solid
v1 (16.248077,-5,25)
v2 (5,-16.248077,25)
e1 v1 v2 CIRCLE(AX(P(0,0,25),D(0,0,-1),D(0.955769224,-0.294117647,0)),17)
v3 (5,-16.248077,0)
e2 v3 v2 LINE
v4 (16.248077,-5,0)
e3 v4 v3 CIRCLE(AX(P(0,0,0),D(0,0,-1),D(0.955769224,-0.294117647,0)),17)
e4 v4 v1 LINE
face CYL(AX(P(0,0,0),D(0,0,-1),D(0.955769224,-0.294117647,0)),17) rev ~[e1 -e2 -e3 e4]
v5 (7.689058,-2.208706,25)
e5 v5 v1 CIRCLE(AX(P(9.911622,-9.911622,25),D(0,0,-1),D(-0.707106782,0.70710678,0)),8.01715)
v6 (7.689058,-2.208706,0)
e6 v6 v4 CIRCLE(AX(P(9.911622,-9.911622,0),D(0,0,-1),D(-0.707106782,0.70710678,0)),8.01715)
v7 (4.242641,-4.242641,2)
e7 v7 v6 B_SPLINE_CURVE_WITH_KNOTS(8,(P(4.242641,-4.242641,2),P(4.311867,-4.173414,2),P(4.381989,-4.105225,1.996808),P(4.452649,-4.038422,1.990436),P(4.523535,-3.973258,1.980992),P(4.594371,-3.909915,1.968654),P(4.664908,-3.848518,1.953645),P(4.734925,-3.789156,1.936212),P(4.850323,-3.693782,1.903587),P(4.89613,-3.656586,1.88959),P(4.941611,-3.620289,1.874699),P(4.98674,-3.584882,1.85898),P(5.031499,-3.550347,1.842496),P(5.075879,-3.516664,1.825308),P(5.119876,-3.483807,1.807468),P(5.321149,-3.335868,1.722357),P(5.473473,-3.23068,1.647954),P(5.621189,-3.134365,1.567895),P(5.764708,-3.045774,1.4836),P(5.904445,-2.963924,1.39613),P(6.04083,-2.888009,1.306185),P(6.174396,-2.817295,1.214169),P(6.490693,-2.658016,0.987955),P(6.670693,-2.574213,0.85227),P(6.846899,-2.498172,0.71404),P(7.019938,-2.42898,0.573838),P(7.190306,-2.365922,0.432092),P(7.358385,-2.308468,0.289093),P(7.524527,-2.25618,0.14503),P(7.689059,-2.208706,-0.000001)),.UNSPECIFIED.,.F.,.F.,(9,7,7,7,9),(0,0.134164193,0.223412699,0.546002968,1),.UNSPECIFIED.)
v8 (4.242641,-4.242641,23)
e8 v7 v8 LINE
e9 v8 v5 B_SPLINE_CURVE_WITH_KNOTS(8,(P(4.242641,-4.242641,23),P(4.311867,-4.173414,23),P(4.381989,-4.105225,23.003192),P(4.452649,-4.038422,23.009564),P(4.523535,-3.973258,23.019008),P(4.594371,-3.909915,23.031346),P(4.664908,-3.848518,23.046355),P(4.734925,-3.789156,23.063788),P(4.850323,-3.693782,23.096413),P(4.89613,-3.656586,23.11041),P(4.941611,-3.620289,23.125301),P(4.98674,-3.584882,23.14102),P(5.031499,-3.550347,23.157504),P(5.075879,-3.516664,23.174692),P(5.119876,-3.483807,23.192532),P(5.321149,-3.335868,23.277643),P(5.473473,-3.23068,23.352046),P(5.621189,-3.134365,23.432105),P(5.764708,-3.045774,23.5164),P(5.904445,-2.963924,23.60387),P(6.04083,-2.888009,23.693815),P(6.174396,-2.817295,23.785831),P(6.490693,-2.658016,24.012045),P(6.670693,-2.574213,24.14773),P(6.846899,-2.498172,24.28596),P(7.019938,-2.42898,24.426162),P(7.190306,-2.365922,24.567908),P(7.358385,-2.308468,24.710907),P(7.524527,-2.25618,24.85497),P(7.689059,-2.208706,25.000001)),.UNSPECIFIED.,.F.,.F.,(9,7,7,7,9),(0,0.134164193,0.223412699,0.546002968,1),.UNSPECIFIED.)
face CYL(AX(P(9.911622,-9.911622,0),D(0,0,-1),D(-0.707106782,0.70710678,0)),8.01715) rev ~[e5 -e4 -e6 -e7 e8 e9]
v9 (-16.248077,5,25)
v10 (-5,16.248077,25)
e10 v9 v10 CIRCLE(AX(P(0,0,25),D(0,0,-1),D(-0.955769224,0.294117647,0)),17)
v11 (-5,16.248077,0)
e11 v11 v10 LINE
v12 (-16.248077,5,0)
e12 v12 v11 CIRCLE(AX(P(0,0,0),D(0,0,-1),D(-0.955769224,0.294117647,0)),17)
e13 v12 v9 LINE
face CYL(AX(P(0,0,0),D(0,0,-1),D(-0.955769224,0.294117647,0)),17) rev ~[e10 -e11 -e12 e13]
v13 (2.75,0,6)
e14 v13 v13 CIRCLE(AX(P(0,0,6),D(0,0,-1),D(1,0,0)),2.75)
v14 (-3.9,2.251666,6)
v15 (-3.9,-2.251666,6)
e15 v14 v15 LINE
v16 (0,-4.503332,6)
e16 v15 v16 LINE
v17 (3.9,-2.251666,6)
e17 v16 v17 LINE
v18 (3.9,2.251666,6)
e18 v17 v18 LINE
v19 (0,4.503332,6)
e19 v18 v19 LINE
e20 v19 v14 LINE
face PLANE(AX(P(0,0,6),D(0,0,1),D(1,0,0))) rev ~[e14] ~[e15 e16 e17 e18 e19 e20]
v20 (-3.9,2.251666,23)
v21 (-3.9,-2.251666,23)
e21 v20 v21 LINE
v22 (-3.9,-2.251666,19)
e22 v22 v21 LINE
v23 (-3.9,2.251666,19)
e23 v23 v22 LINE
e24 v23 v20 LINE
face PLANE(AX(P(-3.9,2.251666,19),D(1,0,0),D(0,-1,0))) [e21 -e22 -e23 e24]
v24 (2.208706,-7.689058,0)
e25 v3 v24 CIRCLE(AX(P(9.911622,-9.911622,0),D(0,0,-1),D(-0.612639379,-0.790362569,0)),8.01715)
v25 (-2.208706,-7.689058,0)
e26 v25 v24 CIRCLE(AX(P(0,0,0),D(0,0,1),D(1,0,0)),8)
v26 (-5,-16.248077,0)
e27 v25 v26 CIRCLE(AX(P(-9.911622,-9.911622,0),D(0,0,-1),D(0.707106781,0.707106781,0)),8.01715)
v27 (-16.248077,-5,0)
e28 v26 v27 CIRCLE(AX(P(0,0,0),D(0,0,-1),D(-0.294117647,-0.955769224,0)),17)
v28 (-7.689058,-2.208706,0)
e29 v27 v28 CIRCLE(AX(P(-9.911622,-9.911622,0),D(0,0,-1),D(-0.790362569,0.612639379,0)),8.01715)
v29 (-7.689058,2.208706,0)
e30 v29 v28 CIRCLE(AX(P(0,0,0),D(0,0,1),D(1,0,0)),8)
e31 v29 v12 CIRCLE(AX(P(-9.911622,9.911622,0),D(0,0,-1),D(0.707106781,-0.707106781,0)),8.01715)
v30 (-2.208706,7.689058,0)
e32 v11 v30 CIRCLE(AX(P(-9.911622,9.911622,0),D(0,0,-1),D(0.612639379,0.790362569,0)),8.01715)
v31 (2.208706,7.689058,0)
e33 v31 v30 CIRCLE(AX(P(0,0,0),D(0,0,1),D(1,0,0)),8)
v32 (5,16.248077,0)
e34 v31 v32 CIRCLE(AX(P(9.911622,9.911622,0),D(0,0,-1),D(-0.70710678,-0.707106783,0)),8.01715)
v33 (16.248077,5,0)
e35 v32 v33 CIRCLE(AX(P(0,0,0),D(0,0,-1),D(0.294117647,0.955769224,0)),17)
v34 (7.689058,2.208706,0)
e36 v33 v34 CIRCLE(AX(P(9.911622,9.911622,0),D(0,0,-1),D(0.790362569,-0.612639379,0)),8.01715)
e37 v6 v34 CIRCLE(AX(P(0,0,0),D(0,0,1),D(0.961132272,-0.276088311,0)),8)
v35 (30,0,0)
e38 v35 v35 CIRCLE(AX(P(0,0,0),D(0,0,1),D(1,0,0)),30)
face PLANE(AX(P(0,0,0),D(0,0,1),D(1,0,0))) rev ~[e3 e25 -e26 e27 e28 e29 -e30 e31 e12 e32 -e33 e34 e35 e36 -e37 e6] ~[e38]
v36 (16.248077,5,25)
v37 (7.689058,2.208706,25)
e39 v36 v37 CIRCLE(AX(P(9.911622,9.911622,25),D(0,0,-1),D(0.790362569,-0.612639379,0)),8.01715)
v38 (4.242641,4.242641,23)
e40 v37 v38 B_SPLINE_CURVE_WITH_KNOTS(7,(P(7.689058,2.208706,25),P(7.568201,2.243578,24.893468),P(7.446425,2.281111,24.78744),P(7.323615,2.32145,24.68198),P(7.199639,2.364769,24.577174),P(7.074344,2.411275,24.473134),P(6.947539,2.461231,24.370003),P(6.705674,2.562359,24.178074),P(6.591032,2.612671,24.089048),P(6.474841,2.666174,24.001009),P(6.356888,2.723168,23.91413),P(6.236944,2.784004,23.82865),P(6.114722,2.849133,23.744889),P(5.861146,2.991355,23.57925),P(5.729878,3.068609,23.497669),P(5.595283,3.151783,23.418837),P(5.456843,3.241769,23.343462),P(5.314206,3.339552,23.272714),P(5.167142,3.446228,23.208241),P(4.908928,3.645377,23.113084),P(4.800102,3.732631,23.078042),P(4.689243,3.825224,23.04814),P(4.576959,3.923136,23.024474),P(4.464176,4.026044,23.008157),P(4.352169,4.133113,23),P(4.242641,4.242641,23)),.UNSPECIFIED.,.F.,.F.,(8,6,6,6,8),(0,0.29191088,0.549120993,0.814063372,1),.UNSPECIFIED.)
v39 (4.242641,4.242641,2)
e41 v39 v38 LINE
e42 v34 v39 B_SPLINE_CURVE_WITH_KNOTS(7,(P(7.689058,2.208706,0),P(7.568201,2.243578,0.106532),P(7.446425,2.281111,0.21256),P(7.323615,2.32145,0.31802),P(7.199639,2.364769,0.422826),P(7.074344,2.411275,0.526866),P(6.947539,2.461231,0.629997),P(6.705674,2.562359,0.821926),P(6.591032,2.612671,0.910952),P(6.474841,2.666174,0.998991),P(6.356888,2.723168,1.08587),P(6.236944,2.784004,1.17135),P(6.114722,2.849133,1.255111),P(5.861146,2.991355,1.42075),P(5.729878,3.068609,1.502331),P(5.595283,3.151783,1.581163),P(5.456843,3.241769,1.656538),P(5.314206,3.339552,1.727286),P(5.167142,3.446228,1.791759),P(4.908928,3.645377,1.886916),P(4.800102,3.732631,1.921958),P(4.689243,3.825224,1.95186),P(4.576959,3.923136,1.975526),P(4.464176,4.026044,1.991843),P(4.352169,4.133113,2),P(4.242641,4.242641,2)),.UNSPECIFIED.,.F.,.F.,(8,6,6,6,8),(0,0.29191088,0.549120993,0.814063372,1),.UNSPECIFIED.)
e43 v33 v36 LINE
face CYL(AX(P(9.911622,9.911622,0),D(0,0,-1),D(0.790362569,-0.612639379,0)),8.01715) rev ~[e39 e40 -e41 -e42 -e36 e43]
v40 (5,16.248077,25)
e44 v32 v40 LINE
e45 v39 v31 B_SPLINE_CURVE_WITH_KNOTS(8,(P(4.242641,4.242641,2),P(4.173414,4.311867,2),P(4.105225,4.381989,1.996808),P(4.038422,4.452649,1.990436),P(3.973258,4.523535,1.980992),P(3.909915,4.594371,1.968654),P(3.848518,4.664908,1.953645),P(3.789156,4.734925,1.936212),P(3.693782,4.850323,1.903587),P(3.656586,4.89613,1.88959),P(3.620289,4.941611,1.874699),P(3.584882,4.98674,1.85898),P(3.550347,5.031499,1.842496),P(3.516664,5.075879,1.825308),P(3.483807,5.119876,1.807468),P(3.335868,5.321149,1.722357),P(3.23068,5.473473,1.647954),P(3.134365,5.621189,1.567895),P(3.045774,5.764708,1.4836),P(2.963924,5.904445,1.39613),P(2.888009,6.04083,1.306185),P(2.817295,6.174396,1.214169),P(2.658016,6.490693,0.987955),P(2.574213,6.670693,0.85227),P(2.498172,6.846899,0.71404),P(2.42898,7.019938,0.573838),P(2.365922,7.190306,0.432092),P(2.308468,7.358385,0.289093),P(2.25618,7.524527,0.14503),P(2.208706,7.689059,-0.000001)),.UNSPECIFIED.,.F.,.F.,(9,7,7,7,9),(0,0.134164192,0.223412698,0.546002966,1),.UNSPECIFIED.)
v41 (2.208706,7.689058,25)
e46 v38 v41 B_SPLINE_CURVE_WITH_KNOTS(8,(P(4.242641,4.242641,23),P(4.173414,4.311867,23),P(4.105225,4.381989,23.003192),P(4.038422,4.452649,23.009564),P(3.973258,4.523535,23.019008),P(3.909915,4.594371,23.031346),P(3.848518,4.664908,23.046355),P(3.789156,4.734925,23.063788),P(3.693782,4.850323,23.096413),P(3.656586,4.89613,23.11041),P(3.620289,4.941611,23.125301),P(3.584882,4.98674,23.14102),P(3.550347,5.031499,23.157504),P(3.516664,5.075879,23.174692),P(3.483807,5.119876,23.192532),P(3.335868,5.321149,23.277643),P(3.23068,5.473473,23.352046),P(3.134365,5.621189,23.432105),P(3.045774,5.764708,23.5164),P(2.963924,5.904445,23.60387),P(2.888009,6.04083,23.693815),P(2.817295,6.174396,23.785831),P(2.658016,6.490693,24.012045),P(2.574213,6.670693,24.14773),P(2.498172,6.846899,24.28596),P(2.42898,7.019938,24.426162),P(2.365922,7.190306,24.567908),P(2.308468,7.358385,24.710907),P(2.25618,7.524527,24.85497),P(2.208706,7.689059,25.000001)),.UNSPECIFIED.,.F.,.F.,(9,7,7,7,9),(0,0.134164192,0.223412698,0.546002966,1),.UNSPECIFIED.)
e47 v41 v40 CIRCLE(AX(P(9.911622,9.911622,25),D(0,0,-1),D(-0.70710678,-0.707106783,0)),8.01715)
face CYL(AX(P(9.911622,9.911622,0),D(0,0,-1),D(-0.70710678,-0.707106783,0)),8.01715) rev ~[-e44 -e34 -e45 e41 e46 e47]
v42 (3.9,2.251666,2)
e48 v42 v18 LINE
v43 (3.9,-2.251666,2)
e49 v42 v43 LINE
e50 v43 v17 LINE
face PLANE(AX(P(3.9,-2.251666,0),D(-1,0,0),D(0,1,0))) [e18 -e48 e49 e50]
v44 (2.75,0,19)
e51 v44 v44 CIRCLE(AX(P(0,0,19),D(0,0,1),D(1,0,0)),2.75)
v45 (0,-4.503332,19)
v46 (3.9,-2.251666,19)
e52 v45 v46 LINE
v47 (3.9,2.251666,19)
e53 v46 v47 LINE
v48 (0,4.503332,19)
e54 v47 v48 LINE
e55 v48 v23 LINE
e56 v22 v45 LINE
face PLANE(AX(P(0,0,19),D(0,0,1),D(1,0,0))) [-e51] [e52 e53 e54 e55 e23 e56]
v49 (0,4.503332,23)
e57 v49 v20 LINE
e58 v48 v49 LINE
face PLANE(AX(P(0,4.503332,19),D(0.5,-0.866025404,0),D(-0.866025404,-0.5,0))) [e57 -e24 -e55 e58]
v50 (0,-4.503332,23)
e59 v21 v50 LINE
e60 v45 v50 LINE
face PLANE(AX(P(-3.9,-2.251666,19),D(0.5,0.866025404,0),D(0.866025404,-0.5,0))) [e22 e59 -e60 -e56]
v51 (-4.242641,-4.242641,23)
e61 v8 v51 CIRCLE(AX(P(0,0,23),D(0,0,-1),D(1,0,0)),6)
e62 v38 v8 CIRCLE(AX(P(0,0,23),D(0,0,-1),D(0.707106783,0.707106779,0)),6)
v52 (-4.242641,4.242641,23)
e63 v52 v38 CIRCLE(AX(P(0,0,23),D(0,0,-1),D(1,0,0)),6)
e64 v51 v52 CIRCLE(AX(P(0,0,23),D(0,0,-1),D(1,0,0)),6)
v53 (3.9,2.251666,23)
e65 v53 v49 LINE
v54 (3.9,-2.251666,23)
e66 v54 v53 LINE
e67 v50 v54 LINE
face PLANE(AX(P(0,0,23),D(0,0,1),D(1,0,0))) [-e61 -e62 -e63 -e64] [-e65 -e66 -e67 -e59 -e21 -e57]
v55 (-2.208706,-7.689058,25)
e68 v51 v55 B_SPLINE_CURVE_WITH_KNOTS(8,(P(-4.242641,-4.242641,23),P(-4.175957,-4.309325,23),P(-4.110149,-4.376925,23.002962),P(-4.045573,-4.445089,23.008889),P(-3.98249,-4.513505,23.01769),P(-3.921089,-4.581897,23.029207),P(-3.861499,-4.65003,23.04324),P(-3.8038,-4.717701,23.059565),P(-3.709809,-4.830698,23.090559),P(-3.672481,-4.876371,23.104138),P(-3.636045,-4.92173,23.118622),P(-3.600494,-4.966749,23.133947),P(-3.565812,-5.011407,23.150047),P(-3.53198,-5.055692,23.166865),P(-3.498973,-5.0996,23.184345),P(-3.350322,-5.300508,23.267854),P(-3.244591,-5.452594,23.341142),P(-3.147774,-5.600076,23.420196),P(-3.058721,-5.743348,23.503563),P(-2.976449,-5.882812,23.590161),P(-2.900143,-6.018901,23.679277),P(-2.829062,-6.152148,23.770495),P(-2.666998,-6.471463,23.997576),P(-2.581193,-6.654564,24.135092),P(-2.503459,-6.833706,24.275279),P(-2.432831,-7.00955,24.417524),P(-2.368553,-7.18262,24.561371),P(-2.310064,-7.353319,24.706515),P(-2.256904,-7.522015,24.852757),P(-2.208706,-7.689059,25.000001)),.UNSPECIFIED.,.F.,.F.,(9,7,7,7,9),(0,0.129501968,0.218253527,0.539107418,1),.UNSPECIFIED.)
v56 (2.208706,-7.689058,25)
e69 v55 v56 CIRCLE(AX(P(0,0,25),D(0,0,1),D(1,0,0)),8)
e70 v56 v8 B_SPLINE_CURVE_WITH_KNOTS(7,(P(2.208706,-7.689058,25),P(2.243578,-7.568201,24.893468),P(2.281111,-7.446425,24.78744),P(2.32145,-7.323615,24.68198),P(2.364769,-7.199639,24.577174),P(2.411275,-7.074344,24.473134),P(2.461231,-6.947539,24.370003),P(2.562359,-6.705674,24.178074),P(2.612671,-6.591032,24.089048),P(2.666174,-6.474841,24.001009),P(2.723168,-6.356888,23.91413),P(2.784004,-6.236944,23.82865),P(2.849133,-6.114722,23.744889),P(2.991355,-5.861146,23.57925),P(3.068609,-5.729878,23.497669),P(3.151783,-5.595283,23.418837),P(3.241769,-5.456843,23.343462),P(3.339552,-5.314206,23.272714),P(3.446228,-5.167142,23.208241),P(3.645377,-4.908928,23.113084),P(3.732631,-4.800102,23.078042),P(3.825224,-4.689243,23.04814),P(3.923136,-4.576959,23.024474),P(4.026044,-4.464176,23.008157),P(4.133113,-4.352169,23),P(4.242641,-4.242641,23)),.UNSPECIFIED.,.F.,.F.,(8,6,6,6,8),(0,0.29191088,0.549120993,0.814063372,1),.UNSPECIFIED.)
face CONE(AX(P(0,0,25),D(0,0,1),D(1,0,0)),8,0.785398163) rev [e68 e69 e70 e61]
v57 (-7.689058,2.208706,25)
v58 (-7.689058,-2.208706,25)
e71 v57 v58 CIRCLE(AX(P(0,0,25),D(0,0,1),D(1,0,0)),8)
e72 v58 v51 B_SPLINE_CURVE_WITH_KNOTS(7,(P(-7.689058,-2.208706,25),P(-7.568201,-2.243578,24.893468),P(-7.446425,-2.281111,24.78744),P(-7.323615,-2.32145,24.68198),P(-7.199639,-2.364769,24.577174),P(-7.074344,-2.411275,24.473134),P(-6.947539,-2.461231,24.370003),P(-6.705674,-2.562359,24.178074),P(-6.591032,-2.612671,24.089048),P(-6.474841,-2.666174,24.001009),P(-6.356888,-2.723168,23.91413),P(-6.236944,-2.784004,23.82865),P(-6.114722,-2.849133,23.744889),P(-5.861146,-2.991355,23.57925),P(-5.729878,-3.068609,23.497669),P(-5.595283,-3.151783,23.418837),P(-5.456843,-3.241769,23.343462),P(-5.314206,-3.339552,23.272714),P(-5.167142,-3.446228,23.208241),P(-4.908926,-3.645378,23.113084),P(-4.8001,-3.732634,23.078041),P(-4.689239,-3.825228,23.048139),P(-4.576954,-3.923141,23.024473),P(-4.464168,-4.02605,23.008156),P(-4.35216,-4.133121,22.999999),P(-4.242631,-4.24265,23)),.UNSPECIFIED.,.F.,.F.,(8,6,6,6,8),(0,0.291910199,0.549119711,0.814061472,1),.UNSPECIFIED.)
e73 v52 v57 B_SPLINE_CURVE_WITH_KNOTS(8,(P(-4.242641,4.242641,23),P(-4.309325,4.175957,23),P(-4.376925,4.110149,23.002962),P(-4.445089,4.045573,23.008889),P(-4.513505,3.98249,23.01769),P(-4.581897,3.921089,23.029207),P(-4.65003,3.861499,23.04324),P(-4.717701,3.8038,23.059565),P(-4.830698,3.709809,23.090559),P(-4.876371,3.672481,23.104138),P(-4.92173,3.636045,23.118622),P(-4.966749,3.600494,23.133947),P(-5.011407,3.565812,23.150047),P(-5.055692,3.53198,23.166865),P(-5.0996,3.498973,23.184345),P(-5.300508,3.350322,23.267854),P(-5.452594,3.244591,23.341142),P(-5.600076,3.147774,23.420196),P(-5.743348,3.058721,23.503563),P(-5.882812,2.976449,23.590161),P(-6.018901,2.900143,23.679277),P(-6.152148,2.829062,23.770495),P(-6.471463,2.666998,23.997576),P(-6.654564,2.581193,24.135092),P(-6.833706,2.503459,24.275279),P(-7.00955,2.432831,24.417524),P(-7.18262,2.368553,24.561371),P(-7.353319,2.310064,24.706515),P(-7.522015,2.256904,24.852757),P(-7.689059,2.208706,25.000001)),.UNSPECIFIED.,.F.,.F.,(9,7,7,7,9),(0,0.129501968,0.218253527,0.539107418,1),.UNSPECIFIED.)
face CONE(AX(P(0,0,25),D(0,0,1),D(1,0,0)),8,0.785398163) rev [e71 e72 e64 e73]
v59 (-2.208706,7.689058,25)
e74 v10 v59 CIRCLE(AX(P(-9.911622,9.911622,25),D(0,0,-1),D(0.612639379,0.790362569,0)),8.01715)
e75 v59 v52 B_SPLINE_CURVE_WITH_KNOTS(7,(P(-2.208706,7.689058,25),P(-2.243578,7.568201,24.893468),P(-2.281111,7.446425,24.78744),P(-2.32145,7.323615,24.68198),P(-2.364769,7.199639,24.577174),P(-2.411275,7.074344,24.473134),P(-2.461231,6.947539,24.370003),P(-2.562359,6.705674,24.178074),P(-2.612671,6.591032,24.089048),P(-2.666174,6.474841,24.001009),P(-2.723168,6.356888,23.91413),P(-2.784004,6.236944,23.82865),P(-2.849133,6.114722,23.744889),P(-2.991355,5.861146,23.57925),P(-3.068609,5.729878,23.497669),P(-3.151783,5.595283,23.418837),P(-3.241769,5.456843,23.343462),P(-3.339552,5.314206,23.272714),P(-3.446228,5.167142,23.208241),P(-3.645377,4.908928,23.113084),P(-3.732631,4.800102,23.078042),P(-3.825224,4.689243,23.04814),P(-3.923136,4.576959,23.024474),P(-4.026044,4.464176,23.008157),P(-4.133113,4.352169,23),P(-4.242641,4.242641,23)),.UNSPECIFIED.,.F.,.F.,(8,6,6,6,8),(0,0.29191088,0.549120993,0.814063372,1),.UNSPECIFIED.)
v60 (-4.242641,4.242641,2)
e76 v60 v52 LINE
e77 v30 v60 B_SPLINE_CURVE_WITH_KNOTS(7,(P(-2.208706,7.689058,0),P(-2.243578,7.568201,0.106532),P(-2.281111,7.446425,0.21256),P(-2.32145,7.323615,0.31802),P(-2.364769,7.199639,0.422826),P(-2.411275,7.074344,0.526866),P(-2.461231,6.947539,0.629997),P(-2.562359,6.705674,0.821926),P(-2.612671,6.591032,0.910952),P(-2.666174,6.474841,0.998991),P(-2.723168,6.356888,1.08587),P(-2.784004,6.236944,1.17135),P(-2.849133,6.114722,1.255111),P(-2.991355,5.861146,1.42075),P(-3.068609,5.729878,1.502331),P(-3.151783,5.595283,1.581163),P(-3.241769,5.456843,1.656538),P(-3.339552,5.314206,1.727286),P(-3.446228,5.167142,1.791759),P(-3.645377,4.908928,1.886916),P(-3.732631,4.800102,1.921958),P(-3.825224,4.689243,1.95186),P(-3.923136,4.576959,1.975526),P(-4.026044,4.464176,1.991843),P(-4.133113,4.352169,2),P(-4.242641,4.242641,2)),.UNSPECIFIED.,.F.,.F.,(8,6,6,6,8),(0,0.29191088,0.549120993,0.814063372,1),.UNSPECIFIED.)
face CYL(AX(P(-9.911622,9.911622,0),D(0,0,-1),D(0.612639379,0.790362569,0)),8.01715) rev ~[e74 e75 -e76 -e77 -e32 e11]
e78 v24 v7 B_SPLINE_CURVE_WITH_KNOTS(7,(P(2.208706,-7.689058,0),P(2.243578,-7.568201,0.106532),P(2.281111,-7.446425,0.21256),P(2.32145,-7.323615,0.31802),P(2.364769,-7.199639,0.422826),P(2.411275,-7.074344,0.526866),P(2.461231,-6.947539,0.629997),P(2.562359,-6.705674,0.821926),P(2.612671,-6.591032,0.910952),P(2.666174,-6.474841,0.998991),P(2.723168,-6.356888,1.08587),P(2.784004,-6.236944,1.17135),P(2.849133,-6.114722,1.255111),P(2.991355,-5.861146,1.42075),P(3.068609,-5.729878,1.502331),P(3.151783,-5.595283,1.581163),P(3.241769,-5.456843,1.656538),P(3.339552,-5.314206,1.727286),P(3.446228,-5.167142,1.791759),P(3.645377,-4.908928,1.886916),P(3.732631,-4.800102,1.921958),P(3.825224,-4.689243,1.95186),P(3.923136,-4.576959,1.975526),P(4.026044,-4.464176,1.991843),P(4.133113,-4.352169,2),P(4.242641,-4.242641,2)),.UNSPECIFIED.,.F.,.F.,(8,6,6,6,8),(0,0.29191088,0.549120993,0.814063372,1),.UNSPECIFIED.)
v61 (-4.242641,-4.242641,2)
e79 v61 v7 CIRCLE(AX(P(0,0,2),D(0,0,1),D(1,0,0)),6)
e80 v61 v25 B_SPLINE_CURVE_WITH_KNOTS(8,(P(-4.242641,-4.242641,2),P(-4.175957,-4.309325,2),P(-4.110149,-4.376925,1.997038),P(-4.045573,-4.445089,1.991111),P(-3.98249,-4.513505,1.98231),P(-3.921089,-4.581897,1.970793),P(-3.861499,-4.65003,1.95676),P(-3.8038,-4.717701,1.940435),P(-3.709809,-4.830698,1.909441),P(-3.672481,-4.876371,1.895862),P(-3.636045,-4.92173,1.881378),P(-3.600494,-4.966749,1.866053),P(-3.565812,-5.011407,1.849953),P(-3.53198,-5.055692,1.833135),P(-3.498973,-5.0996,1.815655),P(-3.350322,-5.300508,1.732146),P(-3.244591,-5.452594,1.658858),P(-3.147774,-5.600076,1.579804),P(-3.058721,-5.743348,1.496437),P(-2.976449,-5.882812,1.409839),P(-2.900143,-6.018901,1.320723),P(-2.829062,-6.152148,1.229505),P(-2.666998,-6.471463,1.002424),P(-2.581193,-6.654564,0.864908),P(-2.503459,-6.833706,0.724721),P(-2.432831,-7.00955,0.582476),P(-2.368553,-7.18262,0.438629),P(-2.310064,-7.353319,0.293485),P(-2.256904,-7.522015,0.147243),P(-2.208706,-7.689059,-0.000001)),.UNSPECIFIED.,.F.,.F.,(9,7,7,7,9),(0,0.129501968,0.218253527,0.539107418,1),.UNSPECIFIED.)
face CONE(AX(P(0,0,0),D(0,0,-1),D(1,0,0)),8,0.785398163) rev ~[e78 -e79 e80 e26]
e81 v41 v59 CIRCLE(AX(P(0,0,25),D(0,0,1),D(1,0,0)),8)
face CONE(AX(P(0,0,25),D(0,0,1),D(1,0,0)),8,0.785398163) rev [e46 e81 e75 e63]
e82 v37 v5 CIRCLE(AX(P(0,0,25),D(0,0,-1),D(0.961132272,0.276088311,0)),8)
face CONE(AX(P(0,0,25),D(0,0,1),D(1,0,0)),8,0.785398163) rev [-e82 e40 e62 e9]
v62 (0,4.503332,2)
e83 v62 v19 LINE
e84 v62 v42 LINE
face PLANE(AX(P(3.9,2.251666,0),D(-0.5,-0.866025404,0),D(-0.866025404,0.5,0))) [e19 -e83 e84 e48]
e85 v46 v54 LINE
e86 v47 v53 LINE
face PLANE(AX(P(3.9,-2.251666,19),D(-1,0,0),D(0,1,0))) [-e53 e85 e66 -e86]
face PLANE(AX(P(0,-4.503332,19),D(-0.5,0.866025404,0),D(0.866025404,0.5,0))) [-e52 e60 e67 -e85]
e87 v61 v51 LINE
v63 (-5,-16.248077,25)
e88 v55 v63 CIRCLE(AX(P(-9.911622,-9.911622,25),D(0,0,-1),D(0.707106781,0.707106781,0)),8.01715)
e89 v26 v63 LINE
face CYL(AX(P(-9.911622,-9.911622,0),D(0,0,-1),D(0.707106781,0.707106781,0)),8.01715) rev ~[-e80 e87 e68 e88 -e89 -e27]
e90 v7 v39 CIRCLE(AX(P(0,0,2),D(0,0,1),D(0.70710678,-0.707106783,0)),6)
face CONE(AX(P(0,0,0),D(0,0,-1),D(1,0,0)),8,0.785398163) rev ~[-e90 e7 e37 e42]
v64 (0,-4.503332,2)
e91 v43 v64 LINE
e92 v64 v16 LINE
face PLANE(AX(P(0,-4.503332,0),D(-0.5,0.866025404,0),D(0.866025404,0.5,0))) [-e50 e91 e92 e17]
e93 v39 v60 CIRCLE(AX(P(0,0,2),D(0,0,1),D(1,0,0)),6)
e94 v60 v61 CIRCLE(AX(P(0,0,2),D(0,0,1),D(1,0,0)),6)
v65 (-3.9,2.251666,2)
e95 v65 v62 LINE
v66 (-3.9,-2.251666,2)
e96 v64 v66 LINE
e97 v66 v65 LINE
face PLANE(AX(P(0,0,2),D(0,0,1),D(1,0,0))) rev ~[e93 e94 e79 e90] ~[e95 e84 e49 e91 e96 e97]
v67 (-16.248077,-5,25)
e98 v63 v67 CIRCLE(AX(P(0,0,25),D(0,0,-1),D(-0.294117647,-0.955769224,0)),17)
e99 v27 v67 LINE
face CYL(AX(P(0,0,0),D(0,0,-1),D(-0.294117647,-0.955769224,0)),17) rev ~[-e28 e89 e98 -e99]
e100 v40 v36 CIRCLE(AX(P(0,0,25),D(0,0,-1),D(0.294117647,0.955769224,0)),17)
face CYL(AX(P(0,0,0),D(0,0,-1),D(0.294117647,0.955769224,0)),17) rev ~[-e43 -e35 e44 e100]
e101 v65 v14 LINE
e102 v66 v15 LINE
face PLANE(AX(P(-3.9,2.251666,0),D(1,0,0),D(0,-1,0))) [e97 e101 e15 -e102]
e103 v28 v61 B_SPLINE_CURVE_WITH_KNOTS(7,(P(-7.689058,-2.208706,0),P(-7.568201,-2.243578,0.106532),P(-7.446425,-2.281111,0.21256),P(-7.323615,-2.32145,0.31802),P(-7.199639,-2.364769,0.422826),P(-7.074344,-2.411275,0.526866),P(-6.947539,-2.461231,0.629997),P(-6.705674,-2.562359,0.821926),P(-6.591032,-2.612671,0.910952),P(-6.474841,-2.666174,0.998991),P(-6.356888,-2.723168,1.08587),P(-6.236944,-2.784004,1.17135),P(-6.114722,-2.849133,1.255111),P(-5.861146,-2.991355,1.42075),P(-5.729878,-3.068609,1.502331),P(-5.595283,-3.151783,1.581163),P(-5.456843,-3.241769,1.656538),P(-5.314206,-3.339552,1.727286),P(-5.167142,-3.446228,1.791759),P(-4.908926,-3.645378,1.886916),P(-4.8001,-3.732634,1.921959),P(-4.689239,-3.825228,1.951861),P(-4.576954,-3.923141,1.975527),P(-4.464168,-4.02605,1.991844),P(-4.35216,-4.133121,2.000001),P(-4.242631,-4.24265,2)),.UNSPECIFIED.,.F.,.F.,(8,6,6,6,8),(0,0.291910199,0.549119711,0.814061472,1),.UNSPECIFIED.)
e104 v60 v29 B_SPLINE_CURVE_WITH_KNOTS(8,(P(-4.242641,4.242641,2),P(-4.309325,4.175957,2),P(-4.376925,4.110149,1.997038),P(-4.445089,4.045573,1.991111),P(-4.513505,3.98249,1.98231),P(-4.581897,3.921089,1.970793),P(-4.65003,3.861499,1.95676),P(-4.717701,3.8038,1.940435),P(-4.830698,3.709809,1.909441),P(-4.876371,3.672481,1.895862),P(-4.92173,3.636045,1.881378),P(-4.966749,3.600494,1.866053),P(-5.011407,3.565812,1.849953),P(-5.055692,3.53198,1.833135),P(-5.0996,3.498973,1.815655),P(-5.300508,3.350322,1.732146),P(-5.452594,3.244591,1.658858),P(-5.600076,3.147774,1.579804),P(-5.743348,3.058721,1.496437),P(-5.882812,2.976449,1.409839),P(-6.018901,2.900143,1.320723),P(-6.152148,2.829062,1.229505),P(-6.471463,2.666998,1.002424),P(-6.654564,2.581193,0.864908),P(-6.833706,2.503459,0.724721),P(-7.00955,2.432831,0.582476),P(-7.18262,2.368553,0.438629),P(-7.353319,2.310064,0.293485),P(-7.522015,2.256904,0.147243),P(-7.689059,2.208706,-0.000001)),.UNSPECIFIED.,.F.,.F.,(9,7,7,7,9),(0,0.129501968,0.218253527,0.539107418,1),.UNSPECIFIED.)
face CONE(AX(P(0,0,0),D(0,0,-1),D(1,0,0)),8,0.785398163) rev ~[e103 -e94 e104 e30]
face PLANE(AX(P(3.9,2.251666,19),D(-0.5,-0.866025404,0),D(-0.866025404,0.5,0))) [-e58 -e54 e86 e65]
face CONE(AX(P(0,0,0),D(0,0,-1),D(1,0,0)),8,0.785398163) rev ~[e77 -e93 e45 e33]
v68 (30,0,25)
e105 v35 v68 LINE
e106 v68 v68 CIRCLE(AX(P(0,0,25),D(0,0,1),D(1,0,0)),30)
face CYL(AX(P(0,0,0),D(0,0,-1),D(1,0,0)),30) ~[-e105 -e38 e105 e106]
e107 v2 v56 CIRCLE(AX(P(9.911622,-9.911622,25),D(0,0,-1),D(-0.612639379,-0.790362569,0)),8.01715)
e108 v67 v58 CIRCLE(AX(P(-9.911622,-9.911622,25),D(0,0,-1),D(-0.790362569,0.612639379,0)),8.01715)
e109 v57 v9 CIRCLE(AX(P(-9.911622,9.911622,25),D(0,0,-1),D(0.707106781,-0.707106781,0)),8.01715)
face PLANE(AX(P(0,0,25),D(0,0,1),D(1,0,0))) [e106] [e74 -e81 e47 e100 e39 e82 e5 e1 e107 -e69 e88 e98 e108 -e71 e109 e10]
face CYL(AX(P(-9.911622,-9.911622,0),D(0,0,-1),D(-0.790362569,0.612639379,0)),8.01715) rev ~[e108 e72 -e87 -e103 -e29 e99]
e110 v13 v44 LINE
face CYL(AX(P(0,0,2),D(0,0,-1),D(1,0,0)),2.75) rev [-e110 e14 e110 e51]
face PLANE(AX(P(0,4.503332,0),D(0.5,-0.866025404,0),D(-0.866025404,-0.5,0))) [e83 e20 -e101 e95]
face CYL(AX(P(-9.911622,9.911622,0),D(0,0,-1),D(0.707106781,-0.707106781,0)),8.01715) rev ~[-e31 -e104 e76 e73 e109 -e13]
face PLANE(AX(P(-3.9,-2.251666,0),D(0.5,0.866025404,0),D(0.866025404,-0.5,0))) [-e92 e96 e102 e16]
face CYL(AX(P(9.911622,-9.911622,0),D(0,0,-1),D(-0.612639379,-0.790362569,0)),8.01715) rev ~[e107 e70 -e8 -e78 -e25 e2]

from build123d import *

# Parameters (mm, degrees)
F0_R     = 30
F0_R_2   = 3
F1_DEPTH = 25
F2_START = 2
F0_R_3   = 2.75
F2_DEPTH = 21
F4_DEPTH = 6
F5_START = 19
F5_DEPTH = 4


# Not quite as in the source:
# - a fillet or chamfer that OpenCascade refuses, or shapes differently, is made with other operations: its cross-section is extruded or revolved along the edge and cut away or added
# - a feature names something its author has since deleted; it is built from what else it names


with BuildPart() as f1:
    # F0 (on Top) → F1 (new body)
    with BuildSketch(Plane.XY):
        Circle(F0_R)
        with BuildLine():
            ThreePointArc((16.2480768093, 5), (16.8109682314, 2.5281113744), (17, 0))
            ThreePointArc((17, 0), (16.8109682314, -2.5281113744), (16.2480768093, -5))
            ThreePointArc((16.2480768093, -5), (12.0208152802, -12.0208152802), (5, -16.2480768093))
            ThreePointArc((5, -16.2480768093), (0, -17), (-5, -16.2480768093))
            ThreePointArc((-5, -16.2480768093), (-12.0208152802, -12.0208152802), (-16.2480768093, -5))
            ThreePointArc((-16.2480768093, -5), (-17, 0), (-16.2480768093, 5))
            ThreePointArc((-16.2480768093, 5), (-12.0208152802, 12.0208152802), (-5, 16.2480768093))
            ThreePointArc((-5, 16.2480768093), (0, 17), (5, 16.2480768093))
            ThreePointArc((5, 16.2480768093), (12.0208152802, 12.0208152802), (16.2480768093, 5))
        make_face(mode=Mode.SUBTRACT)
        with BuildLine():
            ThreePointArc((16.2480768093, -5), (16.8109682314, -2.5281113744), (17, 0))
            ThreePointArc((17, 0), (16.8109682314, 2.5281113744), (16.2480768093, 5))
            ThreePointArc((16.2480768093, 5), (10.4163777832, 1.9103772572), (4.2426406998, 4.2426406745))
            ThreePointArc((4.2426406998, 4.2426406745), (5.5432771985, 2.2961005859), (6, 0))
            ThreePointArc((6, 0), (5.5432771928, -2.2961005997), (4.2426406787, -4.2426406956))
            ThreePointArc((4.2426406787, -4.2426406956), (10.4163777683, -1.9103772563), (16.2480768093, -5))
        make_face()
        with BuildLine():
            ThreePointArc((4.2426406998, 4.2426406745), (1.9103772561, 10.4163777654), (5, 16.2480768093))
            ThreePointArc((5, 16.2480768093), (0, 17), (-5, 16.2480768093))
            ThreePointArc((-5, 16.2480768093), (-1.9103772567, 10.4163777743), (-4.2426406871, 4.2426406871))
            ThreePointArc((-4.2426406871, 4.2426406871), (8.9e-09, 6), (4.2426406998, 4.2426406745))
        make_face()
        with BuildLine():
            ThreePointArc((6, 0), (5.5432771985, 2.2961005859), (4.2426406998, 4.2426406745))
            ThreePointArc((4.2426406998, 4.2426406745), (8.9e-09, 6), (-4.2426406871, 4.2426406871))
            ThreePointArc((-4.2426406871, 4.2426406871), (-6, 4e-10), (-4.2426406877, -4.2426406865))
            ThreePointArc((-4.2426406877, -4.2426406865), (-6.4e-09, -6), (4.2426406787, -4.2426406956))
            ThreePointArc((4.2426406787, -4.2426406956), (5.5432771928, -2.2961005997), (6, 0))
        make_face()
        Polygon((0, -4.5033320997), (-3.9, -2.2516660498), (-3.9, 2.2516660498), (0, 4.5033320997), (3.9, 2.2516660498), (3.9, -2.2516660498), align=None, mode=Mode.SUBTRACT)
        with BuildLine():
            ThreePointArc((-5, -16.2480768093), (0, -17), (5, -16.2480768093))
            ThreePointArc((5, -16.2480768093), (1.910377257, -10.4163777803), (4.2426406787, -4.2426406956))
            ThreePointArc((4.2426406787, -4.2426406956), (-6.4e-09, -6), (-4.2426406877, -4.2426406865))
            ThreePointArc((-4.2426406877, -4.2426406865), (-1.9103772566, -10.4163777739), (-5, -16.2480768093))
        make_face()
        with BuildLine():
            ThreePointArc((-4.2426406877, -4.2426406865), (-6, 4e-10), (-4.2426406871, 4.2426406871))
            ThreePointArc((-4.2426406871, 4.2426406871), (-10.4163777743, 1.9103772567), (-16.2480768093, 5))
            ThreePointArc((-16.2480768093, 5), (-17, 0), (-16.2480768093, -5))
            ThreePointArc((-16.2480768093, -5), (-10.4163777747, -1.9103772567), (-4.2426406877, -4.2426406865))
        make_face()
        Polygon((-3.9, 2.2516660498), (-3.9, -2.2516660498), (0, -4.5033320997), (3.9, -2.2516660498), (3.9, 2.2516660498), (0, 4.5033320997), align=None)
        Circle(F0_R_2, mode=Mode.SUBTRACT)
    extrude(amount=F1_DEPTH)

    # F0 (on Top) → F2 (join)
    with BuildSketch(Plane.XY.offset(F2_START)):
        Circle(F0_R_2)
        Circle(F0_R_3, mode=Mode.SUBTRACT)
    extrude(amount=F2_DEPTH)

    # F3: chamfer of 5 on 2 edges, made by hand


with BuildPart() as f3_tool2:
    # F3_s3 → F3_t4 (revolve)
    with BuildSketch(Plane.XZ):
        Polygon((8, 0), (3, 5), (3, 0), align=None)
    revolve(axis=Axis((0, 0, 0), (0, 0, 1)))

    split(bisect_by=Plane.XY.offset(2), keep=Keep.BOTTOM)


with BuildPart() as f1_1:
    add(f1.part)

    # F3_t1: cut F3_tool2
    add(f3_tool2.part, mode=Mode.SUBTRACT)


with BuildPart() as f3_tool7:
    # F3_s8 → F3_t9 (revolve)
    with BuildSketch(Plane.XZ):
        Polygon((8, 25), (3, 20), (3, 25), align=None)
    revolve(axis=Axis((0, 0, 25), (0, 0, 1)))

    split(bisect_by=Plane.XY.offset(23), keep=Keep.TOP)


with BuildPart() as f1_2:
    add(f1_1.part)

    # F3_t6: cut F3_tool7
    add(f3_tool7.part, mode=Mode.SUBTRACT)

    # F0 (on Top) → F4 (cut)
    with BuildSketch(Plane.XY):
        Polygon((-3.9, 2.2516660498), (-3.9, -2.2516660498), (0, -4.5033320997), (3.9, -2.2516660498), (3.9, 2.2516660498), (0, 4.5033320997), align=None)
        Circle(F0_R_2, mode=Mode.SUBTRACT)
        Circle(F0_R_2)
        Circle(F0_R_3, mode=Mode.SUBTRACT)
        Circle(F0_R_3)
    extrude(amount=F4_DEPTH, mode=Mode.SUBTRACT)

    # F0 (on Top) → F5 (cut)
    with BuildSketch(Plane.XY.offset(F5_START)):
        Polygon((-3.9, 2.2516660498), (-3.9, -2.2516660498), (0, -4.5033320997), (3.9, -2.2516660498), (3.9, 2.2516660498), (0, 4.5033320997), align=None)
        Circle(F0_R_2, mode=Mode.SUBTRACT)
        Circle(F0_R_2)
        Circle(F0_R_3, mode=Mode.SUBTRACT)
    extrude(amount=F5_DEPTH, mode=Mode.SUBTRACT)


solid = f1_2.part
